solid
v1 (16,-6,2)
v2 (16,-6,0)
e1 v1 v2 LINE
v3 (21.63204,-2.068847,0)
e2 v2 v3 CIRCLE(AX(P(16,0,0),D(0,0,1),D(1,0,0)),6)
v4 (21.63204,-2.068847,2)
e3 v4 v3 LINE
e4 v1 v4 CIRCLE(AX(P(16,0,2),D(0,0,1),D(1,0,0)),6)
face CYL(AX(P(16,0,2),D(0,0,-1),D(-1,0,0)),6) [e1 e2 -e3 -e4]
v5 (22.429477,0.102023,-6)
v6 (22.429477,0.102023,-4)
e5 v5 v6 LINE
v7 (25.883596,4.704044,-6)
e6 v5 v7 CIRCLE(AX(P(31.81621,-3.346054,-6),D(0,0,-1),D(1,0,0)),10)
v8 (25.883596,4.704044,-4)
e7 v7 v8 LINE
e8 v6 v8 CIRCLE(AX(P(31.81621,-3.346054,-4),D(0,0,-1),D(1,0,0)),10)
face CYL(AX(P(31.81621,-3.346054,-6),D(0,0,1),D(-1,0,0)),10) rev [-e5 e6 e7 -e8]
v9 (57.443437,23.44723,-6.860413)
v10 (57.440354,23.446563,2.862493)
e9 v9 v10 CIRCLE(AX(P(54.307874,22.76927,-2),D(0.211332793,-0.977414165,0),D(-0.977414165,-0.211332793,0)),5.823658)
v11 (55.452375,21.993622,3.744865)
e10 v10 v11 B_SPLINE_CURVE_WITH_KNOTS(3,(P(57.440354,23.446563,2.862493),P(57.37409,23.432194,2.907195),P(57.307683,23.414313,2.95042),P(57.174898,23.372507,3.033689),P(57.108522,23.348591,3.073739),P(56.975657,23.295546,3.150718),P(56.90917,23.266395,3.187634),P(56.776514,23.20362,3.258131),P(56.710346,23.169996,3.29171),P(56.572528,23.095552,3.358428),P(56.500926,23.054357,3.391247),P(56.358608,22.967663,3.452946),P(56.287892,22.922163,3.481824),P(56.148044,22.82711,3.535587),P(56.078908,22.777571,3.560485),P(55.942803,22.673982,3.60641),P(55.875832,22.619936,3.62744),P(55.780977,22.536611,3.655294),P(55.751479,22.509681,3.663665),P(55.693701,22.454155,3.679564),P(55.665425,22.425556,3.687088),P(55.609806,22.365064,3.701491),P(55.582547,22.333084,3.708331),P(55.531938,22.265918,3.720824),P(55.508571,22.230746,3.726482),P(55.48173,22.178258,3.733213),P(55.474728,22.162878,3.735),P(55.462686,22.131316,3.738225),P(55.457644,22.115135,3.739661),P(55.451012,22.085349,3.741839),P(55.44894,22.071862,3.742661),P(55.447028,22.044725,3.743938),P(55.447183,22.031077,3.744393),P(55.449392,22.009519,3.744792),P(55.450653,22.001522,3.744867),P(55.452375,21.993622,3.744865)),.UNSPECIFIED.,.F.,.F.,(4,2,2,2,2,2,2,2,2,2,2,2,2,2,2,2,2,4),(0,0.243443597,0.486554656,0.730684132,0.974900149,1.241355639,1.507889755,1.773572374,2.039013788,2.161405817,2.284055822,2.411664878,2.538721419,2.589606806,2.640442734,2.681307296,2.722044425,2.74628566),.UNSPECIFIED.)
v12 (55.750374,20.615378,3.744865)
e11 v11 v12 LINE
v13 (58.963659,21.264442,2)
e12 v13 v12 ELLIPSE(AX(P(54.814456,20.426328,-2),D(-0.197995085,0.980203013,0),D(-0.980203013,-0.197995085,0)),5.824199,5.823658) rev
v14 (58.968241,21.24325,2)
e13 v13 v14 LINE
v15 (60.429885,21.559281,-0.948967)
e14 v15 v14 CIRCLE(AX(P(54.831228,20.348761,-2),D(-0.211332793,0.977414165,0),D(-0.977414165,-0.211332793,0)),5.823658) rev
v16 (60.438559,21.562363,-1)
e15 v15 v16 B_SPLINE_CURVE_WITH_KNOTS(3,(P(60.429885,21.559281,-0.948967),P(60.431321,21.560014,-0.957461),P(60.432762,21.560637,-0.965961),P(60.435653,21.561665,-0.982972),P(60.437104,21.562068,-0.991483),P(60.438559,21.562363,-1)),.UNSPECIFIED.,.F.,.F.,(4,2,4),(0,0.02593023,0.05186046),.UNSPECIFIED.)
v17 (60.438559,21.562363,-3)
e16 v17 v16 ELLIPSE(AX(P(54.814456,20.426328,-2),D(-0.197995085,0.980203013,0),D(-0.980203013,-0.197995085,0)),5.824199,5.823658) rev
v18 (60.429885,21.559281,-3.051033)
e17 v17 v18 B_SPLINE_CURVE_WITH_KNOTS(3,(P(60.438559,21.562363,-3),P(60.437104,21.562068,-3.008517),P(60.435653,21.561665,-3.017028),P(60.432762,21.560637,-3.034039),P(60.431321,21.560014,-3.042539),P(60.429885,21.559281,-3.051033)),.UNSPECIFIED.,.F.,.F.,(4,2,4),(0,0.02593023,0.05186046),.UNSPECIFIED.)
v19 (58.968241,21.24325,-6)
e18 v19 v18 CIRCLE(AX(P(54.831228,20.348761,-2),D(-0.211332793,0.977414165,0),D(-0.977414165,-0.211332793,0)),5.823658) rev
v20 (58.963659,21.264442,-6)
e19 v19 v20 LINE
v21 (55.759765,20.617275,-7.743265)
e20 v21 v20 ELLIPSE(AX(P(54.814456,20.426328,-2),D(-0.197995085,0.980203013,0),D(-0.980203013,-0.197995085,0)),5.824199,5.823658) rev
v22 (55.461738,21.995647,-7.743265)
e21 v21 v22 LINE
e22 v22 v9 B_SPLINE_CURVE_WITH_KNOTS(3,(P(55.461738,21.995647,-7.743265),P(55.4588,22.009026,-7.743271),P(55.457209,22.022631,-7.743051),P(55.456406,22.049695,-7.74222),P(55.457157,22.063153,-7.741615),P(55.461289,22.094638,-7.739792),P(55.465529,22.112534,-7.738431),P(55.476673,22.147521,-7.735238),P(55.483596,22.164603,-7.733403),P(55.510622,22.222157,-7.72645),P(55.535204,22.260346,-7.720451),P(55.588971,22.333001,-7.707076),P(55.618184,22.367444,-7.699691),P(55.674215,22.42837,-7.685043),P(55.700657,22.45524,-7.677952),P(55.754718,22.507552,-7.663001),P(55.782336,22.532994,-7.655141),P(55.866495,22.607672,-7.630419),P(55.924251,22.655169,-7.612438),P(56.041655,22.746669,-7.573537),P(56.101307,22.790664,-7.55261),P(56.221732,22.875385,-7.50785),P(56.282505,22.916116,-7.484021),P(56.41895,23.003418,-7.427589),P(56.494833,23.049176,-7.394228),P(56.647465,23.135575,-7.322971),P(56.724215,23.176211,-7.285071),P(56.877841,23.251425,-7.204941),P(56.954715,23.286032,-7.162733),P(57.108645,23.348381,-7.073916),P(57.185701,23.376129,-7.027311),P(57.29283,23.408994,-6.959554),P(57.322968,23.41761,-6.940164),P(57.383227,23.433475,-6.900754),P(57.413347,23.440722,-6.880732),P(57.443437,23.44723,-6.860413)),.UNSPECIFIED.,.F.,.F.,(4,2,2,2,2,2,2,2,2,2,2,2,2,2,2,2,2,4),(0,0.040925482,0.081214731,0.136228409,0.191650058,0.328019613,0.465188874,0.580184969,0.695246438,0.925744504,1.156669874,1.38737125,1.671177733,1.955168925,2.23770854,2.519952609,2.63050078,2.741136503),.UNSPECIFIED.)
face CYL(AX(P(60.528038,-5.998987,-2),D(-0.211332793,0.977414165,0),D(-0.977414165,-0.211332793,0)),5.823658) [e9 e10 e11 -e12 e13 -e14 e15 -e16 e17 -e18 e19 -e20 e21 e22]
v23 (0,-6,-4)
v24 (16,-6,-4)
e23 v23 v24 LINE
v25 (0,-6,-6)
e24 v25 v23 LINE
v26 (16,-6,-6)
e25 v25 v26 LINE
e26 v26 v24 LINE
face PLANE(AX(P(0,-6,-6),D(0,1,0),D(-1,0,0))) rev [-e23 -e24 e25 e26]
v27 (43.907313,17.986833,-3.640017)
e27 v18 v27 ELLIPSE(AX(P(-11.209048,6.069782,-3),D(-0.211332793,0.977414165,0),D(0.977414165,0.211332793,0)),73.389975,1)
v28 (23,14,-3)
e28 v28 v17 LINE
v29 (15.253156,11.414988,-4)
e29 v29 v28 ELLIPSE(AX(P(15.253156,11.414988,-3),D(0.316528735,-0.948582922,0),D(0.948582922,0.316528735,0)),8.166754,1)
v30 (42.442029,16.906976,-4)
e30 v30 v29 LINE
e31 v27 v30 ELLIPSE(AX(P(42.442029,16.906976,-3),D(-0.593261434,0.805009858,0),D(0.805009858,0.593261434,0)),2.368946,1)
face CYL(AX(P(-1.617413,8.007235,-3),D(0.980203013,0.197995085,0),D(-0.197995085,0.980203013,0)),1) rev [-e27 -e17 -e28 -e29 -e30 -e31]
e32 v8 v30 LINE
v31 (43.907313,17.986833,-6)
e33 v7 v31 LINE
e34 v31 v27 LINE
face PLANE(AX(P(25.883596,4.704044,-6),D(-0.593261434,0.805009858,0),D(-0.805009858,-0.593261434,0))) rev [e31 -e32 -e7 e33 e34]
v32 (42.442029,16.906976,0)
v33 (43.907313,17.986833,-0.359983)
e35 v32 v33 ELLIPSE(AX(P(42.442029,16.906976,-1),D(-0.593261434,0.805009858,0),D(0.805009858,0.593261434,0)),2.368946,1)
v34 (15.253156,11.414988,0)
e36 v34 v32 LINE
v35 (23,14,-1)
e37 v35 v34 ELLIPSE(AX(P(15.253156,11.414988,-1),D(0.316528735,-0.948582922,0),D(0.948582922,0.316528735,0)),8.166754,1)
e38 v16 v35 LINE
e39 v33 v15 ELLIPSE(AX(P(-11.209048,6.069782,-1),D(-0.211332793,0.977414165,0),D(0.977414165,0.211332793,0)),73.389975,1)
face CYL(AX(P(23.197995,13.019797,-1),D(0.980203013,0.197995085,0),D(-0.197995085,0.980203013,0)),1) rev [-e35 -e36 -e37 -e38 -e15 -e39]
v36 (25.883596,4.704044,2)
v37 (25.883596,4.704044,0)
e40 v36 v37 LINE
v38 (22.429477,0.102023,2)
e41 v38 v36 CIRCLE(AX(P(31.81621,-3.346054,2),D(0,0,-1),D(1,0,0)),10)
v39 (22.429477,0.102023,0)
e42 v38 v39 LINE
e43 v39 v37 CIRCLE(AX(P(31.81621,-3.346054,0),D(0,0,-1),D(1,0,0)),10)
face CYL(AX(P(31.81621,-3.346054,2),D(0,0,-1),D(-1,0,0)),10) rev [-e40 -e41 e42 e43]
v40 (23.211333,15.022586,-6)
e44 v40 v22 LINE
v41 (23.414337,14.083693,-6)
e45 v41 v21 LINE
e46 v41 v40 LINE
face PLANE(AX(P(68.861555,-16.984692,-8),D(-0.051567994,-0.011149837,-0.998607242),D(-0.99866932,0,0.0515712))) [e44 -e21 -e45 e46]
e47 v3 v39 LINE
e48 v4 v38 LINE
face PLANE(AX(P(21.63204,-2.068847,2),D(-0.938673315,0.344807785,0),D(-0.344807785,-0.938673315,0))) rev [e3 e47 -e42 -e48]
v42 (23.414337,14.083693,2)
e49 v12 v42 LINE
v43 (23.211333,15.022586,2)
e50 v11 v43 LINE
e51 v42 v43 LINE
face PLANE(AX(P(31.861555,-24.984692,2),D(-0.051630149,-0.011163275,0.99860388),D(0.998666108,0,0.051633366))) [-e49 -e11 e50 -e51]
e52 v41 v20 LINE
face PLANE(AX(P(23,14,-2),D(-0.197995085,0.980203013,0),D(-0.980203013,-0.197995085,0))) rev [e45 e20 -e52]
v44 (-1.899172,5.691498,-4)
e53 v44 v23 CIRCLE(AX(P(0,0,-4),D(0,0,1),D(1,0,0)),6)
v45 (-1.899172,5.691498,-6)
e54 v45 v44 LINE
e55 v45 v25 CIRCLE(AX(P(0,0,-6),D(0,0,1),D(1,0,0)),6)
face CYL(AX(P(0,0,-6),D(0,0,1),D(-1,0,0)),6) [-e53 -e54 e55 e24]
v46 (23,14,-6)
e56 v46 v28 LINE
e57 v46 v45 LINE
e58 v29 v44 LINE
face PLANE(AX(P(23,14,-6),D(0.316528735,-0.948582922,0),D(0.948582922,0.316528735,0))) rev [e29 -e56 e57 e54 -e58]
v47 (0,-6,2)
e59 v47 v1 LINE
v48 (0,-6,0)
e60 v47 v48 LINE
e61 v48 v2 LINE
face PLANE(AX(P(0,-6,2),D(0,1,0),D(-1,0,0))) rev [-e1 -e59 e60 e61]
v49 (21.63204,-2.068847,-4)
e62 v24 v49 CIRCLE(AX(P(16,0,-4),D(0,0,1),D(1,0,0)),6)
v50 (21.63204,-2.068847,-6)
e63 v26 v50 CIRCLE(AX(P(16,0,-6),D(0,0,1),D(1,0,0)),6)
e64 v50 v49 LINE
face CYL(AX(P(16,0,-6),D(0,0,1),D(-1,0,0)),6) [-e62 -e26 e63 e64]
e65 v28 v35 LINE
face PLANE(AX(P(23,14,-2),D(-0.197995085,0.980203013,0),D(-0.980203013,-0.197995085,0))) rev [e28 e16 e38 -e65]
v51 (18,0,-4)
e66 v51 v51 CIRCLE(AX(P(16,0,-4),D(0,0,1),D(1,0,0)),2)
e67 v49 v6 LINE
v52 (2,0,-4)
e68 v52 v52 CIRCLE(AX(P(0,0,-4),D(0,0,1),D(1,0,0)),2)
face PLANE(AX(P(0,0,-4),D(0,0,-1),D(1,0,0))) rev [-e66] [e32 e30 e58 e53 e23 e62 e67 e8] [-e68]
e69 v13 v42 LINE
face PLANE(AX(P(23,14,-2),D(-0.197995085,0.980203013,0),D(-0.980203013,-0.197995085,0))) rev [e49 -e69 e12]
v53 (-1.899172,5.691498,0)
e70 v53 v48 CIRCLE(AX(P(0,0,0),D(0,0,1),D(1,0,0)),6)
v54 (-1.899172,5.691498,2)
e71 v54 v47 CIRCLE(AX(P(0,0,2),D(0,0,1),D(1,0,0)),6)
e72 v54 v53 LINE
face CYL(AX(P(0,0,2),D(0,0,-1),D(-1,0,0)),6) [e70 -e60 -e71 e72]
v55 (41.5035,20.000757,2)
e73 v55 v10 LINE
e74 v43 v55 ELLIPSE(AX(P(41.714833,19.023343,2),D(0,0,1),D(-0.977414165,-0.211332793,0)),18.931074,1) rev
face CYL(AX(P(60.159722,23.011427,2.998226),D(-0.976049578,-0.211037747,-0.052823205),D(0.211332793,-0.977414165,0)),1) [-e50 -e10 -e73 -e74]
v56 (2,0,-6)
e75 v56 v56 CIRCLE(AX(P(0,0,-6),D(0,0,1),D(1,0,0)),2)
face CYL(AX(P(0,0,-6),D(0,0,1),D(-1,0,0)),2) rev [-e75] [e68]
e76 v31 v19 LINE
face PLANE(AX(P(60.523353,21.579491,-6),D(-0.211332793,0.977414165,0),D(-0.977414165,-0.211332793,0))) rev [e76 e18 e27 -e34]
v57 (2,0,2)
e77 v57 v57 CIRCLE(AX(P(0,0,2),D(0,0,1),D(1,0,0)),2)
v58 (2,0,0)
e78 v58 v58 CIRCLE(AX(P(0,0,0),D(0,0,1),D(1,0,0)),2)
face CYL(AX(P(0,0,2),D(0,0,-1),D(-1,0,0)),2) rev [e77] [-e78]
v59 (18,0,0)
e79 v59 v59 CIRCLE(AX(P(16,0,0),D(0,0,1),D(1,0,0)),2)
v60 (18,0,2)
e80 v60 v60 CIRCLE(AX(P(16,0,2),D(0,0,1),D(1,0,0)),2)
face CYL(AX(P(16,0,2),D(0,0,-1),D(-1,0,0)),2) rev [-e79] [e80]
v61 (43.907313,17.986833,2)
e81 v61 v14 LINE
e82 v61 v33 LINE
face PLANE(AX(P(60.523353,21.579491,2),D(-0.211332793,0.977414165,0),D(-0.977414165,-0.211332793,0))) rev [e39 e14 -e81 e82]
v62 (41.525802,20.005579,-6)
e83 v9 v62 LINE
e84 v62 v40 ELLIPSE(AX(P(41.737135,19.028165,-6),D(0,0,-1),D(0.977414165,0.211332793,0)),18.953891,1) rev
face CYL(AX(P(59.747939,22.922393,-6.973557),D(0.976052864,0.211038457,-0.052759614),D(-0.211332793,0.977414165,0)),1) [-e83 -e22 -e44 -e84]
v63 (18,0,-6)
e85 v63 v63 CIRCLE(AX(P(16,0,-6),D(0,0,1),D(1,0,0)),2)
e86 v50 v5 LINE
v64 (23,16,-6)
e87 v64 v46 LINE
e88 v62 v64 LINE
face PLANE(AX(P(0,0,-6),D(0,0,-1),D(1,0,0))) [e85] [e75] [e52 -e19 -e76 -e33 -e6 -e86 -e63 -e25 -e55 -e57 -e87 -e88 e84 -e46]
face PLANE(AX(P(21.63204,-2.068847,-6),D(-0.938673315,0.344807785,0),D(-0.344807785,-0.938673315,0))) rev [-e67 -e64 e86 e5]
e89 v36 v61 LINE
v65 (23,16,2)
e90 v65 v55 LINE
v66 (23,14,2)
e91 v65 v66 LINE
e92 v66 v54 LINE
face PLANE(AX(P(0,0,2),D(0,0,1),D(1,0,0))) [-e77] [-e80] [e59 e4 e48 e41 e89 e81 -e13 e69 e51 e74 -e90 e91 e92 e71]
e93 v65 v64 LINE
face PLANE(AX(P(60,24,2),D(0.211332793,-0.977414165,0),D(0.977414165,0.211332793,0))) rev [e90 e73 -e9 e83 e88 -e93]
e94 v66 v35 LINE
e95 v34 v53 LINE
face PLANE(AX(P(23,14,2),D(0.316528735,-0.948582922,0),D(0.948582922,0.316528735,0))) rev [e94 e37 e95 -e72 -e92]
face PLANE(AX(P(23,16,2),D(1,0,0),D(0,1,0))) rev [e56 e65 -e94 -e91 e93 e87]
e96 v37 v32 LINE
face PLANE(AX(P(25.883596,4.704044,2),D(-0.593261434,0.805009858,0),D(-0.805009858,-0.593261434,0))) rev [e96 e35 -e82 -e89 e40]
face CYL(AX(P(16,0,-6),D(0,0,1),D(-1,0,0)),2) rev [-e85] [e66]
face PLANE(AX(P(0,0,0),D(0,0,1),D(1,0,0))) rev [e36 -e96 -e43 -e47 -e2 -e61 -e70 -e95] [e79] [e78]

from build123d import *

# Parameters (mm, degrees)
ESQUISSE1_R             = 2
BOSS_EXTRU_1_DEPTH      = 2
BOSS_EXTRU_2_DEPTH      = 2
BOSS_EXTRU_3_REACH      = 67.218
ENL_V_MAT_EXTRU_5_DEPTH = 66.43216575
CONG_1_R                = 1
CONG_2_R                = 1


with BuildPart() as part:
    # Esquisse1 → Boss.-Extru.1 (new body)
    with BuildSketch(Plane.XY):
        with BuildLine():
            Line((0, -6), (16, -6))
            ThreePointArc((16, -6), (19.434160723, -4.920014241), (21.632039887, -2.06884671))
            Line((21.632039887, -2.06884671), (22.429477002, 0.102023476))
            ThreePointArc((22.429477002, 0.102023476), (23.818382286, 2.656840718), (25.883595813, 4.704044206))
            Line((25.883595813, 4.704044206), (43.907312567, 17.986833146))
            Line((43.907312567, 17.986833146), (60.52335338, 21.579490619))
            Line((60.52335338, 21.579490619), (60, 24))
            Line((60, 24), (23, 16))
            Line((23, 16), (23, 14))
            Line((23, 14), (-1.899172411, 5.691497532))
            ThreePointArc((-1.899172411, 5.691497532), (-5.92237221, -0.962032954), (0, -6))
        make_face()
        Circle(ESQUISSE1_R, mode=Mode.SUBTRACT)
        with Locations((16, 0)):
            Circle(ESQUISSE1_R, mode=Mode.SUBTRACT)
    boss_extru_1 = extrude(amount=BOSS_EXTRU_1_DEPTH)

    # Esquisse2 → Boss.-Extru.2 (add)
    with BuildSketch(Plane(origin=(0, 0, 0), x_dir=(-1, 0, 0), z_dir=(0, 0, -1))):
        Polygon((-60.52335338, 21.579490619), (-60, 24), (-23, 16), (-23, 14), align=None)
    boss_extru_2 = extrude(amount=BOSS_EXTRU_2_DEPTH)

    # Symétrie1: Boss.-Extru.1, Boss.-Extru.2 across plane
    add(boss_extru_1.mirror(Plane.XY.offset(-2)))
    add(boss_extru_2.mirror(Plane.XY.offset(-2)))

    # Boss.-Extru.3: up to this plane
    boss_extru_3_end = Plane(origin=(23, 14, -2), z_dir=(-0.19799508496371696, 0.9802030128142897, 0))
    # Esquisse7 → Boss.-Extru.3 (add, up to the surface)
    with BuildSketch(Plane(origin=(-2.277739009, 10.534542917, 0), x_dir=(0.9774141654398673, 0.21133279252753906, 0), z_dir=(-0.21133279252753906, 0.9774141654398673, 0)), mode=Mode.PRIVATE) as boss_extru_3_sk1:
        Polygon((25.861850486, -2), (63.667267202, -3.999795233), (63.716836947, 2), (63.716836947, 8), (25.861850486, 6), align=None)
    boss_extru_3_tool1 = split(extrude(boss_extru_3_sk1.sketch, amount=-BOSS_EXTRU_3_REACH, mode=Mode.PRIVATE), bisect_by=boss_extru_3_end, keep=Keep.BOTH, mode=Mode.PRIVATE)
    add(boss_extru_3_tool1.solids().sort_by_distance((42.727149, 20.265329, -2.000928))[0])

    # Esquisse8 → Enlèv. mat.-Extru.5 (cut, through all)
    with BuildSketch(Plane(origin=(-2.277739009, 10.534542917, 0), x_dir=(0.9774141654398673, 0.21133279252753906, 0), z_dir=(-0.21133279252753906, 0.9774141654398673, 0))):
        with BuildLine():
            Line((57.893179092, 7.823657855), (58.153804594, 10.152084359))
            Line((58.153804594, 10.152084359), (67.029835538, 10.152084359))
            Line((67.029835538, 10.152084359), (67.337455885, -6.822766653))
            Line((67.337455885, -6.822766653), (57.261437216, -6.223219))
            Line((57.261437216, -6.223219), (57.893179092, -3.823657855))
            ThreePointArc((57.893179092, -3.823657855), (63.716836947, 2), (57.893179092, 7.823657855))
        make_face()
    extrude(amount=-ENL_V_MAT_EXTRU_5_DEPTH, mode=Mode.SUBTRACT)

    # Congé1
    cong_1_edges = [part.edges().sort_by_distance(p)[0] for p in [
        (41.588067586, 17.75467732, -4),
        (41.588067586, 17.75467732, 0),
    ]]
    fillet(cong_1_edges, radius=CONG_1_R)

    # Congé2
    # the kernel refuses this fillet: 1 mm, written as the material it takes off along each edge
    with BuildSketch(Plane(origin=(57.690537844, 23.500656831, -7.875164208), x_dir=(0.21133279252753906, -0.9774141654398673, 0), z_dir=(-0.9760528637131802, -0.21103845701906618, 0.05275961425476653))) as cong_2_piece_1_section:
        with BuildLine():
            CenterArc((CONG_2_R, CONG_2_R), CONG_2_R, 180, 90)
            Line((0, CONG_2_R), (0, 0))
            Line((0, 0), (CONG_2_R, 0))
        make_face()
    cong_2_piece_1 = extrude(amount=38.041658791, mode=Mode.PRIVATE)
    cong_2_piece_1 = split(cong_2_piece_1, bisect_by=Plane(origin=(54.069822656, 22.51805355, -6), z_dir=(0, 0, -1)), keep=Keep.TOP, mode=Mode.PRIVATE)
    add(cong_2_piece_1, mode=Mode.SUBTRACT)
    with BuildSketch(Plane(origin=(20.559876055, 15.472405634, 1.867941987), x_dir=(0.2113327925275391, -0.9774141654398673, 0), z_dir=(0.9760495779057013, 0.2110377465742059, 0.05282320504270329))) as cong_2_piece_2_section:
        with BuildLine():
            CenterArc((CONG_2_R, CONG_2_R), CONG_2_R, 180, 90)
            Line((0, CONG_2_R), (0, 0))
            Line((0, 0), (CONG_2_R, 0))
        make_face()
    cong_2_piece_2 = extrude(amount=38.032176769, mode=Mode.PRIVATE)
    cong_2_piece_2 = split(cong_2_piece_2, bisect_by=Plane(origin=(39.441724265, 19.308611578, 2), z_dir=(0, 0, 1)), keep=Keep.TOP, mode=Mode.PRIVATE)
    add(cong_2_piece_2, mode=Mode.SUBTRACT)


solid = part.part
